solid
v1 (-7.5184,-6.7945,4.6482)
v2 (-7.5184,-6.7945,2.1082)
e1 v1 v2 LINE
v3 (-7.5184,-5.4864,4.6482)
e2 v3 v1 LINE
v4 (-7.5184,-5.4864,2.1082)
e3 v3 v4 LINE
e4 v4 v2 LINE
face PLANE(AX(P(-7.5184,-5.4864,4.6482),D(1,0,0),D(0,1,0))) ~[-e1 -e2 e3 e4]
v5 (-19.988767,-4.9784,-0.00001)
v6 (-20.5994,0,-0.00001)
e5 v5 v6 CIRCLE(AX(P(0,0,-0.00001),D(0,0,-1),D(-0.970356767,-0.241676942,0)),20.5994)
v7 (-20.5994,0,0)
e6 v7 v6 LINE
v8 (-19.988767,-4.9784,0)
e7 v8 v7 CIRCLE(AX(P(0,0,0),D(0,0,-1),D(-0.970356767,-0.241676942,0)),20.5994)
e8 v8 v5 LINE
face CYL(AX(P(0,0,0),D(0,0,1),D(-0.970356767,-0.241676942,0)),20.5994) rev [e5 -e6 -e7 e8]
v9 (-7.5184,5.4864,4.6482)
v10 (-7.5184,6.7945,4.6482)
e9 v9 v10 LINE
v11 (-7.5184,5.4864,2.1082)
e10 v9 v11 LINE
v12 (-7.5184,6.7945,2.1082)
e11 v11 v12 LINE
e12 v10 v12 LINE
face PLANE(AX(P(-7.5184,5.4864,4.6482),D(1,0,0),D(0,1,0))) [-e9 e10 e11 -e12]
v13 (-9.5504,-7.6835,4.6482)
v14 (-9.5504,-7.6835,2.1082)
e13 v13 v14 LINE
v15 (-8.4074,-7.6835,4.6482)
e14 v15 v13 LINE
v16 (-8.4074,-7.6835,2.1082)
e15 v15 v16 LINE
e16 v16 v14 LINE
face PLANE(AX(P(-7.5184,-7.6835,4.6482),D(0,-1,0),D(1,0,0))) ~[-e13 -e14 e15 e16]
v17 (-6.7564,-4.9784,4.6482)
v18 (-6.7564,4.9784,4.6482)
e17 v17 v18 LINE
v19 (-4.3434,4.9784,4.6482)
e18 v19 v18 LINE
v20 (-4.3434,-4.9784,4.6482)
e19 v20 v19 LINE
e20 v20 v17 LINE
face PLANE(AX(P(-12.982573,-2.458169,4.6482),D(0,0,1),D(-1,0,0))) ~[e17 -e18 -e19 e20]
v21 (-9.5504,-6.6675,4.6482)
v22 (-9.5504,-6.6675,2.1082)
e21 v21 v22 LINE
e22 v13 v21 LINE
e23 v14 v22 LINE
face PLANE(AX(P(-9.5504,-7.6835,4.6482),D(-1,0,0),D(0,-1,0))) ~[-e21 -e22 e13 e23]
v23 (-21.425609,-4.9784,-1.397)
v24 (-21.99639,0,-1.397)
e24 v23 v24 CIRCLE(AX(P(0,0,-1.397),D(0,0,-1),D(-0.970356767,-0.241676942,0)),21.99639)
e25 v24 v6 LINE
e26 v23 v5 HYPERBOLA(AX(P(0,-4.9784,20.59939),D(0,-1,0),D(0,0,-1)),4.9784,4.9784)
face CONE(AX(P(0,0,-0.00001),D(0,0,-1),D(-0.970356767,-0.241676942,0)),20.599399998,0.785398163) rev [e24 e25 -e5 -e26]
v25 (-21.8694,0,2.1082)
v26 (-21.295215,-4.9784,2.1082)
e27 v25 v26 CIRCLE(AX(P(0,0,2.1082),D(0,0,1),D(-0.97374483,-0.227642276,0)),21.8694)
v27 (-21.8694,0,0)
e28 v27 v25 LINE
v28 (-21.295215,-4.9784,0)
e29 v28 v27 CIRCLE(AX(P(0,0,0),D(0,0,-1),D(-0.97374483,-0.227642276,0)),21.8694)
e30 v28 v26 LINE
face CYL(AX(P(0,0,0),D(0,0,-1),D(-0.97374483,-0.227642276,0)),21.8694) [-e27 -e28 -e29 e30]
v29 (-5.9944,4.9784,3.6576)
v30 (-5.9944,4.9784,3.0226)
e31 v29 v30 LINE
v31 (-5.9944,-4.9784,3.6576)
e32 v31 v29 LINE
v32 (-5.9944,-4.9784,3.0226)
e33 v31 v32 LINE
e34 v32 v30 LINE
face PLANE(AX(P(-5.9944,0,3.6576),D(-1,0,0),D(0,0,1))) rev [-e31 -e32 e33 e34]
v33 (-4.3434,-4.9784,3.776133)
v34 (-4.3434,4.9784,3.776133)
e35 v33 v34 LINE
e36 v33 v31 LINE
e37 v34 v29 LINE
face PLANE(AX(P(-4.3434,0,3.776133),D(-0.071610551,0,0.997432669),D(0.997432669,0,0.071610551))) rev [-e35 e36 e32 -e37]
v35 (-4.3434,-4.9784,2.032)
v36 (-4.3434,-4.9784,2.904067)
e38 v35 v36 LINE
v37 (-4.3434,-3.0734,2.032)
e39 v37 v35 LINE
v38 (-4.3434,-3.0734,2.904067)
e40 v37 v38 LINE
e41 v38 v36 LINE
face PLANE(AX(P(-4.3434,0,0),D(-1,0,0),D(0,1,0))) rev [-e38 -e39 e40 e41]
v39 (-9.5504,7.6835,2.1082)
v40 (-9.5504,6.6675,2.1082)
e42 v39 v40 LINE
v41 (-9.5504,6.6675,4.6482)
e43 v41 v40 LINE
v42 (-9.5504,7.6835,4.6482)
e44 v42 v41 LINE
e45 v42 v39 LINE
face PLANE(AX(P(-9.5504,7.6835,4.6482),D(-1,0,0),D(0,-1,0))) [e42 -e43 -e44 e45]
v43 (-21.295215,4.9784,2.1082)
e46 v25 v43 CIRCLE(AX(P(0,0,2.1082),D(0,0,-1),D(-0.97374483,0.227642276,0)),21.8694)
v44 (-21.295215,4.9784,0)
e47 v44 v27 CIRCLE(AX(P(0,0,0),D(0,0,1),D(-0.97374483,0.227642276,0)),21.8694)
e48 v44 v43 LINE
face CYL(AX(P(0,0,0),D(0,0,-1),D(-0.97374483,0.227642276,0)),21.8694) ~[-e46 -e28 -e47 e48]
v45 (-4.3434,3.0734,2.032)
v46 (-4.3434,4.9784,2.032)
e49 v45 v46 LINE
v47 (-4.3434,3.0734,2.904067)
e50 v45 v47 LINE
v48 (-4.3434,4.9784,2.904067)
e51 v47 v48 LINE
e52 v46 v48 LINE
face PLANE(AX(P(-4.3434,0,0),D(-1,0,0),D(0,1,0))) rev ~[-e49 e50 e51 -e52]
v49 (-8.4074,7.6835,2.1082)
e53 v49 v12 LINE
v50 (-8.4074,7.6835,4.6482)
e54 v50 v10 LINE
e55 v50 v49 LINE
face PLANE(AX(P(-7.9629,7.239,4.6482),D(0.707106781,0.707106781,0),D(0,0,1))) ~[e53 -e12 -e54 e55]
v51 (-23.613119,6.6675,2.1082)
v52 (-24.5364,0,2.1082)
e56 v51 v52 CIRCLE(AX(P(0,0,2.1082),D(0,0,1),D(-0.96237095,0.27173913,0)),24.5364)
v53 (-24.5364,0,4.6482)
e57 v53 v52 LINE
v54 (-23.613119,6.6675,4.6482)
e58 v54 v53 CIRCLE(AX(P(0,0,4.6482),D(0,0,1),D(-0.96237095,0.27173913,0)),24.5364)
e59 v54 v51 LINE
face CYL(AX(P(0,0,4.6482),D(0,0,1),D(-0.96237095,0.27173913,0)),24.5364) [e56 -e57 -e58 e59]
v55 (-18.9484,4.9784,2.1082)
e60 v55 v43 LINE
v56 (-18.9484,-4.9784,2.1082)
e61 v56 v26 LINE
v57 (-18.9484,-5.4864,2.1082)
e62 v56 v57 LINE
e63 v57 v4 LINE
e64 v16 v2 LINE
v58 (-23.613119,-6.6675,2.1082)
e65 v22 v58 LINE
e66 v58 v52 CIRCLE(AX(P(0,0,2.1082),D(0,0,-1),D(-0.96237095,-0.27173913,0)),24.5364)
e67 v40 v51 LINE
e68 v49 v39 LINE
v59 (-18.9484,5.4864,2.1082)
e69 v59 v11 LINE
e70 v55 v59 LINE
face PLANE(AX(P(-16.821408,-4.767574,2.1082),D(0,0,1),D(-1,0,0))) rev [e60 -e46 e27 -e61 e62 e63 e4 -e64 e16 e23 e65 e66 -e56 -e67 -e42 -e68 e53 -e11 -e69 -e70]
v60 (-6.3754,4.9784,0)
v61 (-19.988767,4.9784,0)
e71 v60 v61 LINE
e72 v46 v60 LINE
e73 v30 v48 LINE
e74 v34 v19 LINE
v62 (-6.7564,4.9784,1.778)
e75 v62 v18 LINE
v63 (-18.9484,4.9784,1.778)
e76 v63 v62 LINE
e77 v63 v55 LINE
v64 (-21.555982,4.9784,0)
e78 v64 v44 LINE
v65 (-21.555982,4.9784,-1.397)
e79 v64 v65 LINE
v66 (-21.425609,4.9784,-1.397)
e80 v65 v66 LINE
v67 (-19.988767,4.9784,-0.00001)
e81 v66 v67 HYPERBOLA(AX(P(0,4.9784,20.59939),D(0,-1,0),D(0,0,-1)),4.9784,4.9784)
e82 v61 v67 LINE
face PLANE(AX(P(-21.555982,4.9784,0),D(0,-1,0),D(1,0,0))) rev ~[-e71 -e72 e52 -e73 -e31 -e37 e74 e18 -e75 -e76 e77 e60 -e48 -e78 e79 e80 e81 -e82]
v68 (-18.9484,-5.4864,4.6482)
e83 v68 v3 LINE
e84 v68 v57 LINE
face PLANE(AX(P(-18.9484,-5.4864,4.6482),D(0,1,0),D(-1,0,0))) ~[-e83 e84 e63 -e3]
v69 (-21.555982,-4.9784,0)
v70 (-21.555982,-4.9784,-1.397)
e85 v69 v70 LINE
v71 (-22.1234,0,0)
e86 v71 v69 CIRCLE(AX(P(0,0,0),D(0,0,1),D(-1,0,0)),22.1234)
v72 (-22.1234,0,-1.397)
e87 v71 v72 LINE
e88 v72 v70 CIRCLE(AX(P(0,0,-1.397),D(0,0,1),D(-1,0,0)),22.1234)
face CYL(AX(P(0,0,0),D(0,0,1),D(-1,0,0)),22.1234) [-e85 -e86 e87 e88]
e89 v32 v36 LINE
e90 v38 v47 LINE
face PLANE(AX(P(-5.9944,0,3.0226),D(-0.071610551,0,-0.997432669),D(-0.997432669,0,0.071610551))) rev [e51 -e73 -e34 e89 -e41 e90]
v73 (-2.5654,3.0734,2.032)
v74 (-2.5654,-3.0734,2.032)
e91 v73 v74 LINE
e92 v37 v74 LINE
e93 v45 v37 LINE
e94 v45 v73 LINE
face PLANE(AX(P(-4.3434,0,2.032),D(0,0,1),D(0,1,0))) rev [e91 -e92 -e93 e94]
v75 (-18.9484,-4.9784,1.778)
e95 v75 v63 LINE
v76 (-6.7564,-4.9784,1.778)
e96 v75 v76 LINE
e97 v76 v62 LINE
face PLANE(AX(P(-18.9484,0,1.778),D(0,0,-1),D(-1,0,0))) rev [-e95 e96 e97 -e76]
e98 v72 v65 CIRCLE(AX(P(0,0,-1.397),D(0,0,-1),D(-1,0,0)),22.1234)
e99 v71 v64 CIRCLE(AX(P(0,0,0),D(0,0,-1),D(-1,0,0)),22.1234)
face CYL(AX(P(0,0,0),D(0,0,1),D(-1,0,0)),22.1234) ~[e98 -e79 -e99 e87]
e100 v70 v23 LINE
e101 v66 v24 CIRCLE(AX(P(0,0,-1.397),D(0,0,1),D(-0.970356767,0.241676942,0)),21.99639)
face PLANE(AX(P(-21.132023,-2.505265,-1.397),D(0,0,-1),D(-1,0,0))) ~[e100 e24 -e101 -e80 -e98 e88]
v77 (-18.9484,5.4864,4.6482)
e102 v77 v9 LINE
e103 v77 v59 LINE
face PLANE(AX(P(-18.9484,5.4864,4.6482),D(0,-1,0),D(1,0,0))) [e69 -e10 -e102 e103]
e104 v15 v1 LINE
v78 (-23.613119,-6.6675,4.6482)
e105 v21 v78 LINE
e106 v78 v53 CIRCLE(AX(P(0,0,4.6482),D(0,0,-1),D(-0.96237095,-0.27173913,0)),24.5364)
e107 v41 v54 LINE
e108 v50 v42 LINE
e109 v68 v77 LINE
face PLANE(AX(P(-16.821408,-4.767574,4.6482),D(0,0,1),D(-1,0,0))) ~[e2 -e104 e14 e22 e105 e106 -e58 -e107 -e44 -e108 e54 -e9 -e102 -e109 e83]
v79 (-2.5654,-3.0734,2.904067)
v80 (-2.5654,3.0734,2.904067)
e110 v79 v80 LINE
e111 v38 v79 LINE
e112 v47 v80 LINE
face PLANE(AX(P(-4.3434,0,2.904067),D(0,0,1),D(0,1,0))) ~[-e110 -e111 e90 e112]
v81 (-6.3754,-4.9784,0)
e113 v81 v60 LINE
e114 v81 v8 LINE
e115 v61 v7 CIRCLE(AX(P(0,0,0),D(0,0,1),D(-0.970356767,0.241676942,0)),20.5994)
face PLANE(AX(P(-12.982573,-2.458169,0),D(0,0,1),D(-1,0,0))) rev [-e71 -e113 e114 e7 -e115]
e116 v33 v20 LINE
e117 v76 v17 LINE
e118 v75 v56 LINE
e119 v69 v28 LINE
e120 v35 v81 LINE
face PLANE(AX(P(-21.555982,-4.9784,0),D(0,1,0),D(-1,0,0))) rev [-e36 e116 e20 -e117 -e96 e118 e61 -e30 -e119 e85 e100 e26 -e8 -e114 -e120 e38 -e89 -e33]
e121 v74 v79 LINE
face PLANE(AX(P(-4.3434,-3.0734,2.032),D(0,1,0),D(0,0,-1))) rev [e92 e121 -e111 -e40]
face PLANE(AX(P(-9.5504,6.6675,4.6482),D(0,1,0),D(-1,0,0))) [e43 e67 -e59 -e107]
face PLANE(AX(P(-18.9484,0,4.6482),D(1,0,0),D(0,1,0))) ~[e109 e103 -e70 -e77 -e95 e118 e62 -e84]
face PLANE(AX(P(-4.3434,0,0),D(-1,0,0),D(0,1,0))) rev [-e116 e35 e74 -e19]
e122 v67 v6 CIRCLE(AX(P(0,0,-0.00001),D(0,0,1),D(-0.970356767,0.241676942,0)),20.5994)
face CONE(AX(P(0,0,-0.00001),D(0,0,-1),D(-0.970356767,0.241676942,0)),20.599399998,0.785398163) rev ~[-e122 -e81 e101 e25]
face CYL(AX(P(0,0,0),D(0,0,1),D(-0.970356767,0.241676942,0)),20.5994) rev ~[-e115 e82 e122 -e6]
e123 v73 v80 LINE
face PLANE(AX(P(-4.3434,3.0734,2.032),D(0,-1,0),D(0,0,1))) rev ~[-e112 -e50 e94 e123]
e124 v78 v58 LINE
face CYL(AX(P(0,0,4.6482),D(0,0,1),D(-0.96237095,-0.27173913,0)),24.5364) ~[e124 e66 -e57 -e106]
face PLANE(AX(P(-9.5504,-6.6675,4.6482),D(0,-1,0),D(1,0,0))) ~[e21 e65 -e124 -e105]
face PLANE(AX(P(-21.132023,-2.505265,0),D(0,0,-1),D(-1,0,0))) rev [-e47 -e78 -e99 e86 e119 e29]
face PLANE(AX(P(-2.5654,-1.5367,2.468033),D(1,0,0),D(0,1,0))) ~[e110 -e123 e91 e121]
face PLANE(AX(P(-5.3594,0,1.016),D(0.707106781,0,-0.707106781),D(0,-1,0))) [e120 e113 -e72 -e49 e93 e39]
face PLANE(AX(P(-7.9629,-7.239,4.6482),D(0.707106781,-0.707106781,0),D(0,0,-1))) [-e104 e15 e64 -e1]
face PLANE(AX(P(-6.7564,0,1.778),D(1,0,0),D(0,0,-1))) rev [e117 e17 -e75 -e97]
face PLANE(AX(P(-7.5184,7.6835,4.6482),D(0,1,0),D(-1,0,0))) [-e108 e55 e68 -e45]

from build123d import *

# Parameters (mm, degrees)
F1_DEPTH  = 4.6482
F2_SIZE   = 2.032
F3_W      = 12.192
F3_H      = 2.8702
F4_DEPTH  = 4.9794
F6_DEPTH  = 1.397
F7_SIZE   = 1.39699
F9_DEPTH  = 4.9794
F10_W     = 3.0734
F10_H     = 0.8720666667
F11_DEPTH = 1.778
F13_DEPTH = 2.54
F14_SIZE  = 0.889


# Not quite as in the source:
# - a fillet or chamfer is up to 0.001 mm smaller than in the source, because OpenCascade refuses the exact size


with BuildPart() as f1:
    # F0 (on Top) → F1 (new body)
    with BuildSketch(Plane.XY):
        with BuildLine():
            Line((-21.8694, 0), (-4.3434, 0))
            Line((-4.3434, 0), (-4.3434, 4.9784))
            Line((-4.3434, 4.9784), (-21.2952151856, 4.9784))
            ThreePointArc((-21.2952151856, 4.9784), (-21.7253795748, 2.5057012372), (-21.8694, 0))
        make_face()
    extrude(amount=F1_DEPTH)

    # F2
    f2_edges = [f1.edges().sort_by_distance(p)[0] for p in [
        (-4.3434, 2.4892, 0),
    ]]
    chamfer(f2_edges, length=F2_SIZE)

    # F3 (on face) → F4 (cut, through all)
    with BuildSketch(Plane.XZ):
        with Locations((-12.8524, 3.2131)):
            Rectangle(F3_W, F3_H)
    extrude(amount=-F4_DEPTH, mode=Mode.SUBTRACT)

    # F5 (on face) → F6 (join)
    with BuildSketch(Plane(origin=(0, 0, 0), x_dir=(1, 0, 0), z_dir=(0, 0, -1))):
        with BuildLine():
            ThreePointArc((-22.1234, 0), (-21.9810877831, -2.5053158344), (-21.5559820236, -4.9784))
            Line((-21.5559820236, -4.9784), (-19.9887671906, -4.9784))
            ThreePointArc((-19.9887671906, -4.9784), (-20.4461719061, -2.5078546104), (-20.5994, 0))
            Line((-20.5994, 0), (-22.1234, 0))
        make_face()
    extrude(amount=F6_DEPTH)

    # F7 (size 1.397 in the source; OpenCascade refuses exactly that, so slightly less here)
    f7_edges = [f1.edges().sort_by_distance(p)[0] for p in [
        (-20.446172, 2.507855, -1.397),
    ]]
    chamfer(f7_edges, length=F7_SIZE)

    # F8 (on face) → F9 (cut, through all)
    with BuildSketch(Plane.XZ):
        Polygon((-4.3434, 2.9040666667), (-4.3434, 3.7761333333), (-5.9944, 3.6576), (-5.9944, 3.0226), align=None)
    extrude(amount=-F9_DEPTH, mode=Mode.SUBTRACT)

    # F10 (on face) → F11 (join)
    with BuildSketch(Plane.YZ.offset(-4.3434)):
        with Locations((1.5367, 2.4680333333)):
            Rectangle(F10_W, F10_H)
    extrude(amount=F11_DEPTH)

    # F12 (on face) → F13 (join)
    with BuildSketch(Plane.XY.offset(4.6482)):
        with BuildLine():
            Line((-24.5364, 0), (-18.9484, 0))
            Line((-18.9484, 0), (-18.9484, 5.4864))
            Line((-18.9484, 5.4864), (-7.5184, 5.4864))
            Line((-7.5184, 5.4864), (-7.5184, 7.6835))
            Line((-7.5184, 7.6835), (-9.5504, 7.6835))
            Line((-9.5504, 7.6835), (-9.5504, 6.6675))
            Line((-9.5504, 6.6675), (-23.6131185723, 6.6675))
            ThreePointArc((-23.6131185723, 6.6675), (-24.3044836141, 3.3655610544), (-24.5364, 0))
        make_face()
    extrude(amount=-F13_DEPTH)

    # F14
    f14_edges = [f1.edges().sort_by_distance(p)[0] for p in [
        (-7.5184, 7.6835, 3.3782),
    ]]
    chamfer(f14_edges, length=F14_SIZE)

    # F15: F1 across face


with BuildPart() as f1_1:
    add(f1.part)
    add(f1.part.mirror(Plane(origin=(-14.9823216408, 0, 1.8516826104), x_dir=(1, 0, 0), z_dir=(0, -1, 0))))


solid = f1_1.part
